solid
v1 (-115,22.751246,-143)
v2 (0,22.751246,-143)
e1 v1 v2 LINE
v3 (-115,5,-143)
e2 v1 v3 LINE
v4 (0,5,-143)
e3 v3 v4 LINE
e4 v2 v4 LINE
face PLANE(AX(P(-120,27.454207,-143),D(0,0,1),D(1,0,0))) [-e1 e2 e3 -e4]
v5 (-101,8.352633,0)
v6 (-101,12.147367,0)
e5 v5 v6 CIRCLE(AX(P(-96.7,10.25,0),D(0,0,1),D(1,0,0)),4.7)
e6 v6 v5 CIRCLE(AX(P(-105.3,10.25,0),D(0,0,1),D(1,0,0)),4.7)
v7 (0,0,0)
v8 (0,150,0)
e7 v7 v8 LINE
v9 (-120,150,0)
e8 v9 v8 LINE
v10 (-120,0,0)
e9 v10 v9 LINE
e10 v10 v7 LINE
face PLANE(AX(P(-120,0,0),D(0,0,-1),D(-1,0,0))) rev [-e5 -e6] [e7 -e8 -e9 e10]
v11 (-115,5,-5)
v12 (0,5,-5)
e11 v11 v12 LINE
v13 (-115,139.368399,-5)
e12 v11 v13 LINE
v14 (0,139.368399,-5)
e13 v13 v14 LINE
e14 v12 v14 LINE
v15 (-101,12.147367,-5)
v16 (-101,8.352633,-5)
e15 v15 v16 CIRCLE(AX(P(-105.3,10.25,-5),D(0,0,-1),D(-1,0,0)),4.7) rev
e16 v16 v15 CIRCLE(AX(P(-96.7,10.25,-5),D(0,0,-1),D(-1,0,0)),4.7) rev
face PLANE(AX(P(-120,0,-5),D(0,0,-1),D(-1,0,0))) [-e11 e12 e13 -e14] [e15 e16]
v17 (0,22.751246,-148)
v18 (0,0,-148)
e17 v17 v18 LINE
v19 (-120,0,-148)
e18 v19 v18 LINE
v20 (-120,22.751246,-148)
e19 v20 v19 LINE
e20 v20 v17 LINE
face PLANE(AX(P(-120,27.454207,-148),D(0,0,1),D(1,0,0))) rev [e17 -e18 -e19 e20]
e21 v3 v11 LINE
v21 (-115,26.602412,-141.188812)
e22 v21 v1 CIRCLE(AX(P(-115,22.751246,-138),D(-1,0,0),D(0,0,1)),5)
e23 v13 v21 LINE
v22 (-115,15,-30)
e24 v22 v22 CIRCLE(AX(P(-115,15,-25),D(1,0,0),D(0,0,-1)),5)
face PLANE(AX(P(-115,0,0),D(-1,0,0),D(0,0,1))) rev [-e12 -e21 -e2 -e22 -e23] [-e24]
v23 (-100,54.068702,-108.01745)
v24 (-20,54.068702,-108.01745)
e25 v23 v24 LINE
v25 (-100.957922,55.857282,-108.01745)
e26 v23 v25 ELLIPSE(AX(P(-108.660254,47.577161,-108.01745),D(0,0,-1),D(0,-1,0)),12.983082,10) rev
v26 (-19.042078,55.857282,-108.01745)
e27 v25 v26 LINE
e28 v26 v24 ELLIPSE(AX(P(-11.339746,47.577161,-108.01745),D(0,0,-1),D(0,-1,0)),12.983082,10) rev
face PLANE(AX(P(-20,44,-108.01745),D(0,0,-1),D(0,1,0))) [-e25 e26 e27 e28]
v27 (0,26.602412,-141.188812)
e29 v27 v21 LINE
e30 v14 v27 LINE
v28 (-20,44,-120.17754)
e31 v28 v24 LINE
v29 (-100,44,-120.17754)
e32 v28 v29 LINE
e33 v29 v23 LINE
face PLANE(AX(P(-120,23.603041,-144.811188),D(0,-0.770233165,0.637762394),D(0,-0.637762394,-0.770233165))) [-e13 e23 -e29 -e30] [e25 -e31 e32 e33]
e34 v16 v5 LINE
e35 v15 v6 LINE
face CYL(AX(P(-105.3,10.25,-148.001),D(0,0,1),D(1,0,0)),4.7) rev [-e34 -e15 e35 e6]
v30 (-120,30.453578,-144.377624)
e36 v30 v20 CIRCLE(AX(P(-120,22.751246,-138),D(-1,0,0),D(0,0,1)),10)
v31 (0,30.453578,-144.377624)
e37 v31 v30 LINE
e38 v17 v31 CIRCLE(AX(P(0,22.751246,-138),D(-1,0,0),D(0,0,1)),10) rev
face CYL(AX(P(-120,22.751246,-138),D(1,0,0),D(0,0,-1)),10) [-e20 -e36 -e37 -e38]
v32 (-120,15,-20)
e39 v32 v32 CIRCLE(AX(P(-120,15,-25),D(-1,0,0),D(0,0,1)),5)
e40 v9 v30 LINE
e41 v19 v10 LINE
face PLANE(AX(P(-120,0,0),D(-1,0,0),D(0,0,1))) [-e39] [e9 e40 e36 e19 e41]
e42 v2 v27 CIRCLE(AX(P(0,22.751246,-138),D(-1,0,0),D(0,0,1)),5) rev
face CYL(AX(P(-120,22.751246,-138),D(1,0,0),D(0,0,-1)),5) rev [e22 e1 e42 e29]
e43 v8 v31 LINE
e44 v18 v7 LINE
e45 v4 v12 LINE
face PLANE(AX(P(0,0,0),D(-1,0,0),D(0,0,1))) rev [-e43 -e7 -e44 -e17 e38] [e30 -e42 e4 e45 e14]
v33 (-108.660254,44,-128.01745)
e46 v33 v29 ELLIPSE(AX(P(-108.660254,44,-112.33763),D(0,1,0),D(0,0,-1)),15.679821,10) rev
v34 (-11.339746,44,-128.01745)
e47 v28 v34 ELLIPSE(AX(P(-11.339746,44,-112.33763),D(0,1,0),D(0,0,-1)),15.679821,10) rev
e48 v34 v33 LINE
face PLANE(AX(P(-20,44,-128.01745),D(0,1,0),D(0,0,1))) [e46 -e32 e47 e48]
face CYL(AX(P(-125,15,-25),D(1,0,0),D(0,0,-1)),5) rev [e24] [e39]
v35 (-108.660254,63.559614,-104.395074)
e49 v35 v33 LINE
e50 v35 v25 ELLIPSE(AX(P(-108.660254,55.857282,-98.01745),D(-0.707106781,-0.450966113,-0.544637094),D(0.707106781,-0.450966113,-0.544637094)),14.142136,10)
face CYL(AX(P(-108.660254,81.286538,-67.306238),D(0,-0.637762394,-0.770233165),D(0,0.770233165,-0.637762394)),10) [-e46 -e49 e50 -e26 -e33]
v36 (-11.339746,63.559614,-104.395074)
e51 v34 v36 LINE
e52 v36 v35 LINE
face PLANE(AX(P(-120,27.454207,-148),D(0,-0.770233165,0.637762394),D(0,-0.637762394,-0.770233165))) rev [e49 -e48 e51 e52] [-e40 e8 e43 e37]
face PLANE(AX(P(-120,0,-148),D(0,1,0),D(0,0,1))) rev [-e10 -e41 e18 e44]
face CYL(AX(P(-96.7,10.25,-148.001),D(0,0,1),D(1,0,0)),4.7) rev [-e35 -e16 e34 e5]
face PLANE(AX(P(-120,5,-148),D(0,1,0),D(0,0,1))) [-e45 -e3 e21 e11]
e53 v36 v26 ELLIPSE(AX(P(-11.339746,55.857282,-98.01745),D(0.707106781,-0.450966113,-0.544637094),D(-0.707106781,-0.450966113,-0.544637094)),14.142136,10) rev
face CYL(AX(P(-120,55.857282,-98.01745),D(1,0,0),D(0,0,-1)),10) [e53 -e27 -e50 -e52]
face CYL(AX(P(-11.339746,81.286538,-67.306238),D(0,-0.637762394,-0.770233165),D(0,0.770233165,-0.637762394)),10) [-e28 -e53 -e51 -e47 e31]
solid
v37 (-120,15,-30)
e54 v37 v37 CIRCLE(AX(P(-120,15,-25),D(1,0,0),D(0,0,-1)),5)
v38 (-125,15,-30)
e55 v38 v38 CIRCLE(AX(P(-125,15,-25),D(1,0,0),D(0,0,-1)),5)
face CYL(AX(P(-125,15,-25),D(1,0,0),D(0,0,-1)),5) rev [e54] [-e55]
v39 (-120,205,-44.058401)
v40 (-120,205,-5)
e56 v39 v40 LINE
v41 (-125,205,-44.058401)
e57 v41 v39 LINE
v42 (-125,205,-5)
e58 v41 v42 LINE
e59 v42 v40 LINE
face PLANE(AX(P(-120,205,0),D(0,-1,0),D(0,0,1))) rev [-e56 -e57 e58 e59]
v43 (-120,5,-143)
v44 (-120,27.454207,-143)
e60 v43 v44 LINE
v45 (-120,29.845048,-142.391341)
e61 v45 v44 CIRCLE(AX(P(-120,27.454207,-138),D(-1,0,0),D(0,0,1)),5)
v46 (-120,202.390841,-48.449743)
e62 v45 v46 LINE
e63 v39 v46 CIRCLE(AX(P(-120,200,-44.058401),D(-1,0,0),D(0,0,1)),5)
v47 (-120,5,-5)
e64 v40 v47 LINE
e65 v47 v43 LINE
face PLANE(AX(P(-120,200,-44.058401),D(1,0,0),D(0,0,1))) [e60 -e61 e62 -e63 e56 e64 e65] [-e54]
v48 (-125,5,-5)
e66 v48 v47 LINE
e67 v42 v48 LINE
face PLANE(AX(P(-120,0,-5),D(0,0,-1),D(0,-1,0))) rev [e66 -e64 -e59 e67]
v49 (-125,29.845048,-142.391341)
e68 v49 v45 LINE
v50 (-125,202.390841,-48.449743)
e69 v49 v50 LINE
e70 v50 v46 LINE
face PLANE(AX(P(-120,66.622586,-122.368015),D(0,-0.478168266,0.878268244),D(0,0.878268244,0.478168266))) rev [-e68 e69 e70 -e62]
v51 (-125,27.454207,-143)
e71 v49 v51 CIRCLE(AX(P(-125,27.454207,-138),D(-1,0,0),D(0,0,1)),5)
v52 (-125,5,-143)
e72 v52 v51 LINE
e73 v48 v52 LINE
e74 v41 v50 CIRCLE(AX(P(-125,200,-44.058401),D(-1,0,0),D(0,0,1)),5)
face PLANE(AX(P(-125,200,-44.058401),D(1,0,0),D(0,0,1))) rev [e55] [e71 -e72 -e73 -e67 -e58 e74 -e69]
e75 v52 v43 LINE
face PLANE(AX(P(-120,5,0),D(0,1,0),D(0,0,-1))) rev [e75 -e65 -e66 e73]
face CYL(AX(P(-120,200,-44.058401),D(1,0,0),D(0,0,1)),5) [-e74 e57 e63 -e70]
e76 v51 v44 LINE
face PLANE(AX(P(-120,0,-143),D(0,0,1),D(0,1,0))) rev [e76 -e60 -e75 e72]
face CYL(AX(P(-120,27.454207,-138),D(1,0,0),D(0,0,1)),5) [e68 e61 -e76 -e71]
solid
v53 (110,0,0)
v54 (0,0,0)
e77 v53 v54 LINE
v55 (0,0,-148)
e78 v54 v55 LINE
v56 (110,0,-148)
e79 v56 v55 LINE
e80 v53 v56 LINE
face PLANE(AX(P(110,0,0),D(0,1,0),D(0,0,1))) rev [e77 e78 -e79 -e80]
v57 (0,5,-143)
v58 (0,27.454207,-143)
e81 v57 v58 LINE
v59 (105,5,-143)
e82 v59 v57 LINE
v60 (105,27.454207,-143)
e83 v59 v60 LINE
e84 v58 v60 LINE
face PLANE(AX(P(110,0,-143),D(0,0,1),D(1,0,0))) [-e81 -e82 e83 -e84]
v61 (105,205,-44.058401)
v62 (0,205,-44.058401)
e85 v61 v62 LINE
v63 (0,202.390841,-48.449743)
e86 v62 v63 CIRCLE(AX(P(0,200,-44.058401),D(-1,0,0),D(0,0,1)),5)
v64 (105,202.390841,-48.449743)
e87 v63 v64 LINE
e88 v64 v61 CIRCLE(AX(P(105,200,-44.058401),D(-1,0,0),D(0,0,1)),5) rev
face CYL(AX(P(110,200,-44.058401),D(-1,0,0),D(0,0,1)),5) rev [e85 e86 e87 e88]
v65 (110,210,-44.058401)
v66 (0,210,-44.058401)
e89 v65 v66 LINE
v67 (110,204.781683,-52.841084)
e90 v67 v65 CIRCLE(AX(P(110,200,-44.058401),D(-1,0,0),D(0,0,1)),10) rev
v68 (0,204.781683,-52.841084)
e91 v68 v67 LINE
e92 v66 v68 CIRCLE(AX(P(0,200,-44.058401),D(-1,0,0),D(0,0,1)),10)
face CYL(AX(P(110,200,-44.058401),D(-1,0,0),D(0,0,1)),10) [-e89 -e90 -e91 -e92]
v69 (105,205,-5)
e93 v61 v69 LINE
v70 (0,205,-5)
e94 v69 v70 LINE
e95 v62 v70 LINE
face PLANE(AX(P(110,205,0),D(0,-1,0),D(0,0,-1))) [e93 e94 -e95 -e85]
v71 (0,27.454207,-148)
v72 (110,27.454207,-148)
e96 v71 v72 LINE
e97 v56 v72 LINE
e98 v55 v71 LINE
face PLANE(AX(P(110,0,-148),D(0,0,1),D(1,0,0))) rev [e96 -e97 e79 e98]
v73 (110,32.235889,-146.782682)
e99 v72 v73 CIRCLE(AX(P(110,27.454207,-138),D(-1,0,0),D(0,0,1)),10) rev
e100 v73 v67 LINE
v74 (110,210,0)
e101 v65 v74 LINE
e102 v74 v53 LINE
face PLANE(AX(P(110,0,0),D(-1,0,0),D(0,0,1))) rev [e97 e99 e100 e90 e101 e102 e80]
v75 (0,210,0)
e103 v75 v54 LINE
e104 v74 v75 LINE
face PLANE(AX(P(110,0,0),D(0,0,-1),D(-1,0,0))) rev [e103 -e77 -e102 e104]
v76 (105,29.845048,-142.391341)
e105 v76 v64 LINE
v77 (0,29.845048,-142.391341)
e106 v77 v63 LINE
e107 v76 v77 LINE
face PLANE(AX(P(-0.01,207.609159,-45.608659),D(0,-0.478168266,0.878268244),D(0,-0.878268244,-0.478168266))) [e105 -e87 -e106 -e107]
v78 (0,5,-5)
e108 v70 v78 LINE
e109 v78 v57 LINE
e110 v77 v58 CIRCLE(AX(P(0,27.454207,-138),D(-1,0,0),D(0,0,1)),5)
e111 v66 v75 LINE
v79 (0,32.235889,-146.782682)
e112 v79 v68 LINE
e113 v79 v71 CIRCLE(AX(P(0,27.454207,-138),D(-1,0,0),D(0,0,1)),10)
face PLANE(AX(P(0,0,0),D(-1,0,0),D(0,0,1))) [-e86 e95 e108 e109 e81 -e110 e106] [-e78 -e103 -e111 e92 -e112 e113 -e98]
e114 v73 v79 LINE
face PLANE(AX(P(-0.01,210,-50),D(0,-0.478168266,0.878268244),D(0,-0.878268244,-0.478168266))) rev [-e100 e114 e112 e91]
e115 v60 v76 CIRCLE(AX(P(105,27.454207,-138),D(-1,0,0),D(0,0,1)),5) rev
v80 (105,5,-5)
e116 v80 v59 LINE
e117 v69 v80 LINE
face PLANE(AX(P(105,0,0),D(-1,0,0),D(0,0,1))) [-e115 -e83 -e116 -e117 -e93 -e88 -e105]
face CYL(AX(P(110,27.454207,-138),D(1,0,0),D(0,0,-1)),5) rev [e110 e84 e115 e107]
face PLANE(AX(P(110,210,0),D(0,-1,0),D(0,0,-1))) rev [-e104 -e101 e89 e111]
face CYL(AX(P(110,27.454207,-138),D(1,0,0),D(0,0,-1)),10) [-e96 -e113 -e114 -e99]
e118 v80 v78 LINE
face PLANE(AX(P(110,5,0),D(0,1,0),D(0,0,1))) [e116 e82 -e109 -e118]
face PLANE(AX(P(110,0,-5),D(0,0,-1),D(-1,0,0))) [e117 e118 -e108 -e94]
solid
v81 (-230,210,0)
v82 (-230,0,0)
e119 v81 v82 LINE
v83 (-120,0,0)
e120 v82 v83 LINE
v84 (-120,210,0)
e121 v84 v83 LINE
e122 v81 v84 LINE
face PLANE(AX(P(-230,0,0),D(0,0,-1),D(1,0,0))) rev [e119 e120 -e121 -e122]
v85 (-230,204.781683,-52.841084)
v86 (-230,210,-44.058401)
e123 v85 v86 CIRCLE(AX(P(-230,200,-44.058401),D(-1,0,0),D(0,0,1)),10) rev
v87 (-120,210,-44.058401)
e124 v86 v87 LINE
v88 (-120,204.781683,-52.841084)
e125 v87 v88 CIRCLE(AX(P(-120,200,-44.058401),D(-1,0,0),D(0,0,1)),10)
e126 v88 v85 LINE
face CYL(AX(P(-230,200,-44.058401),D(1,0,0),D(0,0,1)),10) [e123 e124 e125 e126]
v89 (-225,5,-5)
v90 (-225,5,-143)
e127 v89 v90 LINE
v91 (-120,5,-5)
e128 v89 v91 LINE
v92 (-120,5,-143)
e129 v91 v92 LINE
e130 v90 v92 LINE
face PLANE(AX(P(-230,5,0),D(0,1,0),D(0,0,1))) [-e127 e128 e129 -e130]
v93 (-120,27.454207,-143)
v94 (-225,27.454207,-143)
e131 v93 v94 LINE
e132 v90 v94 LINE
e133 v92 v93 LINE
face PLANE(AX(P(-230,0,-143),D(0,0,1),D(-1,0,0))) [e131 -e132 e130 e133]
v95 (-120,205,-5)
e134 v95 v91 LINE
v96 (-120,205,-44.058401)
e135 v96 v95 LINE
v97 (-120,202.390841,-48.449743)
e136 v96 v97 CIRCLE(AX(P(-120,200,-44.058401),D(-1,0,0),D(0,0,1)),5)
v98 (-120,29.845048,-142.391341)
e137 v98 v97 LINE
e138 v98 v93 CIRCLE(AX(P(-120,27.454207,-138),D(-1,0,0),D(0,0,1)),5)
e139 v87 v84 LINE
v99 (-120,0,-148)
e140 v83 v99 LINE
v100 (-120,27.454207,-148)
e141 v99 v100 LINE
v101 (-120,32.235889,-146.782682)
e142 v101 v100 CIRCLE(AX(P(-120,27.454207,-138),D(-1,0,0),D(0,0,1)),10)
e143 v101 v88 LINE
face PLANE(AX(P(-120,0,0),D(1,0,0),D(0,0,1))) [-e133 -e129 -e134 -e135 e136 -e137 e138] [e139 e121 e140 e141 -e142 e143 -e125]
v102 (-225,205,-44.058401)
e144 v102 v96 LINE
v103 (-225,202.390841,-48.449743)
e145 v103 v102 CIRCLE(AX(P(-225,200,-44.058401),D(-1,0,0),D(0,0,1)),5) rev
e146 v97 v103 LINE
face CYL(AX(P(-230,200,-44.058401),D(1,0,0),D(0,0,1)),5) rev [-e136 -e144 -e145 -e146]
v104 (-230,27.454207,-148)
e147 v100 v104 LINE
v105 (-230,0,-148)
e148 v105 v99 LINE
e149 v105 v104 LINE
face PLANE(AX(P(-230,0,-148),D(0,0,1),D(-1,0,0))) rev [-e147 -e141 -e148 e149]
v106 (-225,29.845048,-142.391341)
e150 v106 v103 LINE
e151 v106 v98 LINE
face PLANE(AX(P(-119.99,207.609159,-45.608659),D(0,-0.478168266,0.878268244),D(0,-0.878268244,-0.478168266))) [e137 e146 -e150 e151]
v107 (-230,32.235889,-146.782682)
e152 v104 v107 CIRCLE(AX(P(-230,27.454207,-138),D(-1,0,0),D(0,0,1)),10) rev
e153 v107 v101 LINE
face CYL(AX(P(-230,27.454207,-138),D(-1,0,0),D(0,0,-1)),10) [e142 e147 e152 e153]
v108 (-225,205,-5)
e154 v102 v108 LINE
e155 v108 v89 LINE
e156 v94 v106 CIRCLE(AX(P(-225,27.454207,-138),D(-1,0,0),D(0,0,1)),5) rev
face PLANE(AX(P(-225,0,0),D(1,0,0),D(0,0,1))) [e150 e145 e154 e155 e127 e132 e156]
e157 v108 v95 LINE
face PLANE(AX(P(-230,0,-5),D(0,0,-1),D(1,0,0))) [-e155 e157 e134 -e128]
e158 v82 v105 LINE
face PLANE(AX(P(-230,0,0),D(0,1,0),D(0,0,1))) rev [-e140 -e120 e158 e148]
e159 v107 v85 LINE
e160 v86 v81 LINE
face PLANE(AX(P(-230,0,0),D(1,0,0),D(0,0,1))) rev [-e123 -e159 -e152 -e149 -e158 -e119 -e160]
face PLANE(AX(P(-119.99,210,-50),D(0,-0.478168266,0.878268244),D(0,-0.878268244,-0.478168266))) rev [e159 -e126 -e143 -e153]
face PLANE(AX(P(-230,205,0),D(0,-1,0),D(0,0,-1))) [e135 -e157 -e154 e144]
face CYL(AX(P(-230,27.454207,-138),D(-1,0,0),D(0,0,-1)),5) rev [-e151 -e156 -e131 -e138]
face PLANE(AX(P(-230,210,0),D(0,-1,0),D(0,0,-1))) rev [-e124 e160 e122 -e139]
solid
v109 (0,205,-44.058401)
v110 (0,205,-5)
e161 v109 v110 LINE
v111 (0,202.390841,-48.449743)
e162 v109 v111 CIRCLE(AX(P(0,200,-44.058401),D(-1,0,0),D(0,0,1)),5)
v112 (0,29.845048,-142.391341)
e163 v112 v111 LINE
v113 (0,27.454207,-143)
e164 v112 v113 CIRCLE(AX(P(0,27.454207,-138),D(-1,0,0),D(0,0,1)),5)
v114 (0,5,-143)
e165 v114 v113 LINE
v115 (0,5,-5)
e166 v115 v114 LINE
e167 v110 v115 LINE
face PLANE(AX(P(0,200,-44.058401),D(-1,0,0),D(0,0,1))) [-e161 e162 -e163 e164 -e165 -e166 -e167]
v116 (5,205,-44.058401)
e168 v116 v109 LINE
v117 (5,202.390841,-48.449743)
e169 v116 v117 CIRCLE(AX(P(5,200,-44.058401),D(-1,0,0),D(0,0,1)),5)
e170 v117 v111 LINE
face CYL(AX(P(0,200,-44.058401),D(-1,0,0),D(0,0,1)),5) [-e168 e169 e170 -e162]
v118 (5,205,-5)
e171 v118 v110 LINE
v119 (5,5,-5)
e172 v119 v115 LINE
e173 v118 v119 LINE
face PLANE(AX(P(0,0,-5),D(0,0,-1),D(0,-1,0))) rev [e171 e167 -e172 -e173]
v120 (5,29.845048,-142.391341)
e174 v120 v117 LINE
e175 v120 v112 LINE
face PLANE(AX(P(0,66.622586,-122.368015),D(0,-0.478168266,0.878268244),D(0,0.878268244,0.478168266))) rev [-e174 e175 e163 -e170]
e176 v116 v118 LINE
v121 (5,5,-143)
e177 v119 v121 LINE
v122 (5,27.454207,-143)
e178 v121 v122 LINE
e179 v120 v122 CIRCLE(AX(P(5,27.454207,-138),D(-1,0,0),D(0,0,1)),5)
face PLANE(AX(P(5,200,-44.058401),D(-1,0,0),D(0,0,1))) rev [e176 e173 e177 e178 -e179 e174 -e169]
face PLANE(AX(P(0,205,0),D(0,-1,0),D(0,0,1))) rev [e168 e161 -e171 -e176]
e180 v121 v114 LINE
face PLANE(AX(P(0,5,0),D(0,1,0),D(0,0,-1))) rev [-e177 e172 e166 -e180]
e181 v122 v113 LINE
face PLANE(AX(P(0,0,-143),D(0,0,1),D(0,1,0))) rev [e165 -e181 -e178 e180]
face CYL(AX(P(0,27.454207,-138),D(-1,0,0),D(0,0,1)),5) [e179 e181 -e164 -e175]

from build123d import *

# Parameters (mm, degrees)
SKETCH1_W               = 148
SKETCH1_H               = 210
BOSS_EXTRUDE1_DEPTH     = 110
SPLIT1_SURFACE_1_BACK   = 280.471
SPLIT1_SURFACE_1_DEPTH  = 560.942
FILLET1_R               = 10
SHELL2_T                = -5
THICKEN1_DEPTH          = 5
BOSS_EXTRUDE2_DEPTH     = 120
FILLET2_R               = 10
SHELL3_T                = -5
SKETCH4_R               = 5
CUT_EXTRUDE1_DEPTH      = 10
CUT_EXTRUDE2_DEPTH      = 5
CUT_EXTRUDE3_DEPTH      = 40
CUT_EXTRUDE3_DEPTH_BACK = 40
FILLET3_R               = 10


# Read off the part's stored shape, not the designer's step: Thicken1
with BuildPart() as part:
    # Sketch1 → Boss-Extrude1 (new body)
    with BuildSketch(Plane(origin=(0, 0, 0), x_dir=(0, 0, -1), z_dir=(1, 0, 0))):
        with Locations((74, 105)):
            Rectangle(SKETCH1_W, SKETCH1_H)
    extrude(amount=BOSS_EXTRUDE1_DEPTH)

    # Split1: cut with a surface, the side behind it stays
    # Split1 surface: a surface, the sketch's curves swept straight by 560.942 mm
    with BuildLine(Plane(origin=(110, 0, 0), x_dir=(0, 0, -1), z_dir=(1, 0, 0)).offset(-SPLIT1_SURFACE_1_BACK), mode=Mode.PRIVATE) as split1_surface_1_path:
        Line((50, 210), (148, 30))
    split1_surface_1 = Shell.extrude(split1_surface_1_path.wire(), (1 * SPLIT1_SURFACE_1_DEPTH, 0 * SPLIT1_SURFACE_1_DEPTH, 0 * SPLIT1_SURFACE_1_DEPTH))
    split(bisect_by=split1_surface_1, keep=Keep.BOTTOM)

    # Fillet1
    fillet1_edges = [part.edges().sort_by_distance(p)[0] for p in [
        (55, 210, -50),
        (55, 30, -148),
    ]]
    fillet(fillet1_edges, radius=FILLET1_R)

    # Shell2
    shell2_openings = [part.faces().sort_by_distance(p)[0] for p in [
        (0, 87.139420884, -57.622655137),
    ]]
    offset(amount=SHELL2_T, openings=shell2_openings, kind=Kind.INTERSECTION)


with BuildPart() as body_2:
    # Thicken1 outline → Thicken1 (new body)
    with BuildSketch(Plane.YZ):
        with BuildLine():
            ThreePointArc((27.454206726, -143), (28.68775727, -142.845446631), (29.845048058, -142.391341222))
            Line((29.845048058, -142.391341222), (202.390841332, -48.449742661))
            ThreePointArc((202.390841332, -48.449742661), (204.298500126, -46.612397656), (205, -44.05840144))
            Line((205, -44.05840144), (205, -5))
            Line((205, -5), (5, -5))
            Line((5, -5), (5, -143))
            Line((5, -143), (27.454206726, -143))
        make_face()
    extrude(amount=THICKEN1_DEPTH)


with BuildPart() as body_3:
    # Mirror1: mirrored copy
    add(part.part.mirror(Plane(origin=(-60, 0, 0), x_dir=(0, 0, 1), z_dir=(1, 0, 0))))


with BuildPart() as body_4:
    # Mirror1 2: mirrored copy
    add(body_2.part.mirror(Plane(origin=(-60, 0, 0), x_dir=(0, 0, 1), z_dir=(1, 0, 0))))


with BuildPart() as body_5:
    # Sketch3 → Boss-Extrude2 (new body)
    with BuildSketch(Plane.ZY):
        Polygon((-148, 27.454206726), (0, 150), (0, 0), (-148, 0), align=None)
    extrude(amount=BOSS_EXTRUDE2_DEPTH)

    # Fillet2
    fillet2_edges = [body_5.edges().sort_by_distance(p)[0] for p in [
        (-60, 27.454206726, -148),
    ]]
    fillet(fillet2_edges, radius=FILLET2_R)

    # Shell3
    shell3_openings = [body_5.faces().sort_by_distance(p)[0] for p in [
        (0, 51.421511448, -56.944660016),
    ]]
    offset(amount=SHELL3_T, openings=shell3_openings, kind=Kind.INTERSECTION)


with BuildPart() as cut_extrude1_tool:
    # Sketch4 → Cut-Extrude1 (new body)
    with BuildSketch(Plane(origin=(-115, 0, 0), x_dir=(0, 0, -1), z_dir=(1, 0, 0))):
        with Locations((25, 15)):
            Circle(SKETCH4_R)
    extrude(amount=-CUT_EXTRUDE1_DEPTH)


with BuildPart() as body_4_1:
    add(body_4.part)

    # Cut-Extrude1: cut by cut_extrude1_tool
    add(cut_extrude1_tool.part, mode=Mode.SUBTRACT)


with BuildPart() as body_5_1:
    add(body_5.part)

    # Cut-Extrude1: cut by cut_extrude1_tool
    add(cut_extrude1_tool.part, mode=Mode.SUBTRACT)

    # Sketch5 → Cut-Extrude2 (cut)
    with BuildSketch(Plane.XY):
        with BuildLine():
            ThreePointArc((-101, 12.147366596), (-110, 10.25), (-101, 8.352633404))
            ThreePointArc((-101, 8.352633404), (-92, 10.25), (-101, 12.147366596))
        make_face()
    extrude(amount=-CUT_EXTRUDE2_DEPTH, mode=Mode.SUBTRACT)

    # Sketch7 → Cut-Extrude3 (cut, two sides: drawn at the far end of the back side and taken through both)
    with BuildSketch(Plane(origin=(-60, 0, 0), x_dir=(0, 0, -1), z_dir=(1, 0, 0)).offset(-CUT_EXTRUDE3_DEPTH_BACK)):
        Polygon((128.0174503, 44), (108.0174503, 44), (108.0174503, 60.560242334), align=None)
    extrude(amount=CUT_EXTRUDE3_DEPTH + CUT_EXTRUDE3_DEPTH_BACK, mode=Mode.SUBTRACT)

    # Fillet3
    # the kernel refuses this fillet: 10 mm, written as the material it takes off along each edge
    with BuildSketch(Plane(origin=(-100, 74.368203197, -91.341413097), x_dir=(-1, 0, 0), z_dir=(0, -0.6377623937017006, -0.77023316546347))) as fillet3_piece_1_section:
        with BuildLine():
            CenterArc((8.660254038, -10), FILLET3_R, 90, 60)
            Line((0, -5), (-0.173205081, -4.9))
            ThreePointArc((-0.173205081, -4.9), (-0.2, -2.5), (-0.2, 0))
            Line((-0.2, 0), (0, 0.2))
            Line((0, 0.2), (8.660254038, 0.2))
            Line((8.660254038, 0.2), (8.660254038, 0))
        make_face()
    fillet3_piece_1 = extrude(amount=69.26743329, mode=Mode.PRIVATE)
    fillet3_piece_1 = split(fillet3_piece_1, bisect_by=Plane(origin=(-102.283215667, 51.522014341, -108.0174503), z_dir=(0, 0, -1)), keep=Keep.TOP, mode=Mode.PRIVATE)
    fillet3_piece_1 = split(fillet3_piece_1, bisect_by=Plane(origin=(-102.283215667, 44, -117.101875744), z_dir=(0, 1, 0)), keep=Keep.TOP, mode=Mode.PRIVATE)
    with BuildSketch(Plane(origin=(-20, 74.368203197, -91.341413097), x_dir=(1, 0, 0), z_dir=(0, -0.6377623937017006, -0.77023316546347))) as fillet3_piece_2_section:
        with BuildLine():
            CenterArc((8.660254038, 10), FILLET3_R, 210, 60)
            Line((0, 5), (-0.173205081, 4.9))
            ThreePointArc((-0.173205081, 4.9), (-0.2, 2.5), (-0.2, 0))
            Line((-0.2, 0), (0, -0.2))
            Line((0, -0.2), (8.660254038, -0.2))
            Line((8.660254038, -0.2), (8.660254038, 0))
        make_face()
    fillet3_piece_2 = extrude(amount=69.26743329, mode=Mode.PRIVATE)
    fillet3_piece_2 = split(fillet3_piece_2, bisect_by=Plane(origin=(-17.716784333, 51.522014341, -108.0174503), z_dir=(0, 0, -1)), keep=Keep.TOP, mode=Mode.PRIVATE)
    fillet3_piece_2 = split(fillet3_piece_2, bisect_by=Plane(origin=(-17.716784333, 44, -117.101875744), z_dir=(0, 1, 0)), keep=Keep.TOP, mode=Mode.PRIVATE)
    with BuildSketch(Plane(origin=(-100, 60.560242334, -108.0174503), x_dir=(0, 0.6377623937017001, 0.7702331654634703), z_dir=(1, 0, 0))) as fillet3_piece_3:
        with BuildLine():
            CenterArc((FILLET3_R * 0.470296038318, FILLET3_R), FILLET3_R, 219.625168474, 50.374831526)
            Line((-FILLET3_R * 0.299937127146, FILLET3_R * 0.362237606298), (-FILLET3_R * 0.315341790455, FILLET3_R * 0.349482358424))
            Line((-FILLET3_R * 0.315341790455, FILLET3_R * 0.349482358424), (-FILLET3_R * 0.00940592076635, -FILLET3_R * 0.02))
            Line((-FILLET3_R * 0.00940592076635, -FILLET3_R * 0.02), (FILLET3_R * 0.470296038318, -FILLET3_R * 0.02))
            Line((FILLET3_R * 0.470296038318, -FILLET3_R * 0.02), (FILLET3_R * 0.470296038318, 0))
        make_face()
    fillet3_piece_3_solid = extrude(amount=80, mode=Mode.PRIVATE)
    with BuildSketch(Plane(origin=(-100, 74.368203197, -91.341413097), x_dir=(-1, 0, 0), z_dir=(0, -0.6377623937017006, -0.77023316546347))) as fillet3_piece_4a_section:
        with BuildLine():
            CenterArc((8.660254038, -10), FILLET3_R, 90, 60)
            Line((0, -5), (-0.173205081, -4.9))
            ThreePointArc((-0.173205081, -4.9), (-0.2, -2.5), (-0.2, 0))
            Line((-0.2, 0), (0, 0.2))
            Line((0, 0.2), (8.660254038, 0.2))
            Line((8.660254038, 0.2), (8.660254038, 0))
        make_face()
    fillet3_piece_4a = extrude(amount=69.26743329, mode=Mode.PRIVATE)
    fillet3_piece_4a = split(fillet3_piece_4a, bisect_by=Plane(origin=(-102.112946333, 66.069674888, -108.0174503), z_dir=(0, 0, 1)), keep=Keep.TOP, mode=Mode.PRIVATE)
    with BuildSketch(Plane(origin=(-111.757400958, 60.560242334, -108.0174503), x_dir=(0, 0.6377623937017026, 0.7702331654634684), z_dir=(1, 0, 0))) as fillet3_piece_4b_section:
        with BuildLine():
            CenterArc((FILLET3_R * 0.470296038318, FILLET3_R), FILLET3_R, 219.625168474, 50.374831526)
            Line((-FILLET3_R * 0.299937127146, FILLET3_R * 0.362237606298), (-FILLET3_R * 0.315341790455, FILLET3_R * 0.349482358424))
            Line((-FILLET3_R * 0.315341790455, FILLET3_R * 0.349482358424), (-FILLET3_R * 0.00940592076635, -FILLET3_R * 0.02))
            Line((-FILLET3_R * 0.00940592076635, -FILLET3_R * 0.02), (FILLET3_R * 0.470296038318, -FILLET3_R * 0.02))
            Line((FILLET3_R * 0.470296038318, -FILLET3_R * 0.02), (FILLET3_R * 0.470296038318, 0))
        make_face()
    fillet3_piece_4b = extrude(amount=91.757400958, mode=Mode.PRIVATE)
    fillet3_piece_4b = split(fillet3_piece_4b, bisect_by=Plane(origin=(-100, 60.196176362, -107.243329443), z_dir=(-1, 0, 0)), keep=Keep.TOP, mode=Mode.PRIVATE)
    fillet3_piece_4 = fillet3_piece_4a & fillet3_piece_4b
    with BuildSketch(Plane(origin=(-100, 60.560242334, -108.0174503), x_dir=(0, 0.6377623937017001, 0.7702331654634703), z_dir=(1, 0, 0))) as fillet3_piece_5a_section:
        with BuildLine():
            CenterArc((FILLET3_R * 0.470296038318, FILLET3_R), FILLET3_R, 219.625168474, 50.374831526)
            Line((-FILLET3_R * 0.299937127146, FILLET3_R * 0.362237606298), (-FILLET3_R * 0.315341790455, FILLET3_R * 0.349482358424))
            Line((-FILLET3_R * 0.315341790455, FILLET3_R * 0.349482358424), (-FILLET3_R * 0.00940592076635, -FILLET3_R * 0.02))
            Line((-FILLET3_R * 0.00940592076635, -FILLET3_R * 0.02), (FILLET3_R * 0.470296038318, -FILLET3_R * 0.02))
            Line((FILLET3_R * 0.470296038318, -FILLET3_R * 0.02), (FILLET3_R * 0.470296038318, 0))
        make_face()
    fillet3_piece_5a = extrude(amount=91.757400958, mode=Mode.PRIVATE)
    fillet3_piece_5a = split(fillet3_piece_5a, bisect_by=Plane(origin=(-20, 60.196176362, -107.243329443), z_dir=(1, 0, 0)), keep=Keep.TOP, mode=Mode.PRIVATE)
    with BuildSketch(Plane(origin=(-20, 74.368203197, -91.341413097), x_dir=(1, 0, 0), z_dir=(0, -0.6377623937017006, -0.77023316546347))) as fillet3_piece_5b_section:
        with BuildLine():
            CenterArc((8.660254038, 10), FILLET3_R, 210, 60)
            Line((0, 5), (-0.173205081, 4.9))
            ThreePointArc((-0.173205081, 4.9), (-0.2, 2.5), (-0.2, 0))
            Line((-0.2, 0), (0, -0.2))
            Line((0, -0.2), (8.660254038, -0.2))
            Line((8.660254038, -0.2), (8.660254038, 0))
        make_face()
    fillet3_piece_5b = extrude(amount=69.26743329, mode=Mode.PRIVATE)
    fillet3_piece_5b = split(fillet3_piece_5b, bisect_by=Plane(origin=(-17.887053667, 66.069674888, -108.0174503), z_dir=(0, 0, 1)), keep=Keep.TOP, mode=Mode.PRIVATE)
    fillet3_piece_5 = fillet3_piece_5a & fillet3_piece_5b
    add([fillet3_piece_1, fillet3_piece_2, fillet3_piece_3_solid, fillet3_piece_4, fillet3_piece_5], mode=Mode.SUBTRACT)


solid = Compound([part.part, body_2.part, body_3.part, body_4_1.part, body_5_1.part])
